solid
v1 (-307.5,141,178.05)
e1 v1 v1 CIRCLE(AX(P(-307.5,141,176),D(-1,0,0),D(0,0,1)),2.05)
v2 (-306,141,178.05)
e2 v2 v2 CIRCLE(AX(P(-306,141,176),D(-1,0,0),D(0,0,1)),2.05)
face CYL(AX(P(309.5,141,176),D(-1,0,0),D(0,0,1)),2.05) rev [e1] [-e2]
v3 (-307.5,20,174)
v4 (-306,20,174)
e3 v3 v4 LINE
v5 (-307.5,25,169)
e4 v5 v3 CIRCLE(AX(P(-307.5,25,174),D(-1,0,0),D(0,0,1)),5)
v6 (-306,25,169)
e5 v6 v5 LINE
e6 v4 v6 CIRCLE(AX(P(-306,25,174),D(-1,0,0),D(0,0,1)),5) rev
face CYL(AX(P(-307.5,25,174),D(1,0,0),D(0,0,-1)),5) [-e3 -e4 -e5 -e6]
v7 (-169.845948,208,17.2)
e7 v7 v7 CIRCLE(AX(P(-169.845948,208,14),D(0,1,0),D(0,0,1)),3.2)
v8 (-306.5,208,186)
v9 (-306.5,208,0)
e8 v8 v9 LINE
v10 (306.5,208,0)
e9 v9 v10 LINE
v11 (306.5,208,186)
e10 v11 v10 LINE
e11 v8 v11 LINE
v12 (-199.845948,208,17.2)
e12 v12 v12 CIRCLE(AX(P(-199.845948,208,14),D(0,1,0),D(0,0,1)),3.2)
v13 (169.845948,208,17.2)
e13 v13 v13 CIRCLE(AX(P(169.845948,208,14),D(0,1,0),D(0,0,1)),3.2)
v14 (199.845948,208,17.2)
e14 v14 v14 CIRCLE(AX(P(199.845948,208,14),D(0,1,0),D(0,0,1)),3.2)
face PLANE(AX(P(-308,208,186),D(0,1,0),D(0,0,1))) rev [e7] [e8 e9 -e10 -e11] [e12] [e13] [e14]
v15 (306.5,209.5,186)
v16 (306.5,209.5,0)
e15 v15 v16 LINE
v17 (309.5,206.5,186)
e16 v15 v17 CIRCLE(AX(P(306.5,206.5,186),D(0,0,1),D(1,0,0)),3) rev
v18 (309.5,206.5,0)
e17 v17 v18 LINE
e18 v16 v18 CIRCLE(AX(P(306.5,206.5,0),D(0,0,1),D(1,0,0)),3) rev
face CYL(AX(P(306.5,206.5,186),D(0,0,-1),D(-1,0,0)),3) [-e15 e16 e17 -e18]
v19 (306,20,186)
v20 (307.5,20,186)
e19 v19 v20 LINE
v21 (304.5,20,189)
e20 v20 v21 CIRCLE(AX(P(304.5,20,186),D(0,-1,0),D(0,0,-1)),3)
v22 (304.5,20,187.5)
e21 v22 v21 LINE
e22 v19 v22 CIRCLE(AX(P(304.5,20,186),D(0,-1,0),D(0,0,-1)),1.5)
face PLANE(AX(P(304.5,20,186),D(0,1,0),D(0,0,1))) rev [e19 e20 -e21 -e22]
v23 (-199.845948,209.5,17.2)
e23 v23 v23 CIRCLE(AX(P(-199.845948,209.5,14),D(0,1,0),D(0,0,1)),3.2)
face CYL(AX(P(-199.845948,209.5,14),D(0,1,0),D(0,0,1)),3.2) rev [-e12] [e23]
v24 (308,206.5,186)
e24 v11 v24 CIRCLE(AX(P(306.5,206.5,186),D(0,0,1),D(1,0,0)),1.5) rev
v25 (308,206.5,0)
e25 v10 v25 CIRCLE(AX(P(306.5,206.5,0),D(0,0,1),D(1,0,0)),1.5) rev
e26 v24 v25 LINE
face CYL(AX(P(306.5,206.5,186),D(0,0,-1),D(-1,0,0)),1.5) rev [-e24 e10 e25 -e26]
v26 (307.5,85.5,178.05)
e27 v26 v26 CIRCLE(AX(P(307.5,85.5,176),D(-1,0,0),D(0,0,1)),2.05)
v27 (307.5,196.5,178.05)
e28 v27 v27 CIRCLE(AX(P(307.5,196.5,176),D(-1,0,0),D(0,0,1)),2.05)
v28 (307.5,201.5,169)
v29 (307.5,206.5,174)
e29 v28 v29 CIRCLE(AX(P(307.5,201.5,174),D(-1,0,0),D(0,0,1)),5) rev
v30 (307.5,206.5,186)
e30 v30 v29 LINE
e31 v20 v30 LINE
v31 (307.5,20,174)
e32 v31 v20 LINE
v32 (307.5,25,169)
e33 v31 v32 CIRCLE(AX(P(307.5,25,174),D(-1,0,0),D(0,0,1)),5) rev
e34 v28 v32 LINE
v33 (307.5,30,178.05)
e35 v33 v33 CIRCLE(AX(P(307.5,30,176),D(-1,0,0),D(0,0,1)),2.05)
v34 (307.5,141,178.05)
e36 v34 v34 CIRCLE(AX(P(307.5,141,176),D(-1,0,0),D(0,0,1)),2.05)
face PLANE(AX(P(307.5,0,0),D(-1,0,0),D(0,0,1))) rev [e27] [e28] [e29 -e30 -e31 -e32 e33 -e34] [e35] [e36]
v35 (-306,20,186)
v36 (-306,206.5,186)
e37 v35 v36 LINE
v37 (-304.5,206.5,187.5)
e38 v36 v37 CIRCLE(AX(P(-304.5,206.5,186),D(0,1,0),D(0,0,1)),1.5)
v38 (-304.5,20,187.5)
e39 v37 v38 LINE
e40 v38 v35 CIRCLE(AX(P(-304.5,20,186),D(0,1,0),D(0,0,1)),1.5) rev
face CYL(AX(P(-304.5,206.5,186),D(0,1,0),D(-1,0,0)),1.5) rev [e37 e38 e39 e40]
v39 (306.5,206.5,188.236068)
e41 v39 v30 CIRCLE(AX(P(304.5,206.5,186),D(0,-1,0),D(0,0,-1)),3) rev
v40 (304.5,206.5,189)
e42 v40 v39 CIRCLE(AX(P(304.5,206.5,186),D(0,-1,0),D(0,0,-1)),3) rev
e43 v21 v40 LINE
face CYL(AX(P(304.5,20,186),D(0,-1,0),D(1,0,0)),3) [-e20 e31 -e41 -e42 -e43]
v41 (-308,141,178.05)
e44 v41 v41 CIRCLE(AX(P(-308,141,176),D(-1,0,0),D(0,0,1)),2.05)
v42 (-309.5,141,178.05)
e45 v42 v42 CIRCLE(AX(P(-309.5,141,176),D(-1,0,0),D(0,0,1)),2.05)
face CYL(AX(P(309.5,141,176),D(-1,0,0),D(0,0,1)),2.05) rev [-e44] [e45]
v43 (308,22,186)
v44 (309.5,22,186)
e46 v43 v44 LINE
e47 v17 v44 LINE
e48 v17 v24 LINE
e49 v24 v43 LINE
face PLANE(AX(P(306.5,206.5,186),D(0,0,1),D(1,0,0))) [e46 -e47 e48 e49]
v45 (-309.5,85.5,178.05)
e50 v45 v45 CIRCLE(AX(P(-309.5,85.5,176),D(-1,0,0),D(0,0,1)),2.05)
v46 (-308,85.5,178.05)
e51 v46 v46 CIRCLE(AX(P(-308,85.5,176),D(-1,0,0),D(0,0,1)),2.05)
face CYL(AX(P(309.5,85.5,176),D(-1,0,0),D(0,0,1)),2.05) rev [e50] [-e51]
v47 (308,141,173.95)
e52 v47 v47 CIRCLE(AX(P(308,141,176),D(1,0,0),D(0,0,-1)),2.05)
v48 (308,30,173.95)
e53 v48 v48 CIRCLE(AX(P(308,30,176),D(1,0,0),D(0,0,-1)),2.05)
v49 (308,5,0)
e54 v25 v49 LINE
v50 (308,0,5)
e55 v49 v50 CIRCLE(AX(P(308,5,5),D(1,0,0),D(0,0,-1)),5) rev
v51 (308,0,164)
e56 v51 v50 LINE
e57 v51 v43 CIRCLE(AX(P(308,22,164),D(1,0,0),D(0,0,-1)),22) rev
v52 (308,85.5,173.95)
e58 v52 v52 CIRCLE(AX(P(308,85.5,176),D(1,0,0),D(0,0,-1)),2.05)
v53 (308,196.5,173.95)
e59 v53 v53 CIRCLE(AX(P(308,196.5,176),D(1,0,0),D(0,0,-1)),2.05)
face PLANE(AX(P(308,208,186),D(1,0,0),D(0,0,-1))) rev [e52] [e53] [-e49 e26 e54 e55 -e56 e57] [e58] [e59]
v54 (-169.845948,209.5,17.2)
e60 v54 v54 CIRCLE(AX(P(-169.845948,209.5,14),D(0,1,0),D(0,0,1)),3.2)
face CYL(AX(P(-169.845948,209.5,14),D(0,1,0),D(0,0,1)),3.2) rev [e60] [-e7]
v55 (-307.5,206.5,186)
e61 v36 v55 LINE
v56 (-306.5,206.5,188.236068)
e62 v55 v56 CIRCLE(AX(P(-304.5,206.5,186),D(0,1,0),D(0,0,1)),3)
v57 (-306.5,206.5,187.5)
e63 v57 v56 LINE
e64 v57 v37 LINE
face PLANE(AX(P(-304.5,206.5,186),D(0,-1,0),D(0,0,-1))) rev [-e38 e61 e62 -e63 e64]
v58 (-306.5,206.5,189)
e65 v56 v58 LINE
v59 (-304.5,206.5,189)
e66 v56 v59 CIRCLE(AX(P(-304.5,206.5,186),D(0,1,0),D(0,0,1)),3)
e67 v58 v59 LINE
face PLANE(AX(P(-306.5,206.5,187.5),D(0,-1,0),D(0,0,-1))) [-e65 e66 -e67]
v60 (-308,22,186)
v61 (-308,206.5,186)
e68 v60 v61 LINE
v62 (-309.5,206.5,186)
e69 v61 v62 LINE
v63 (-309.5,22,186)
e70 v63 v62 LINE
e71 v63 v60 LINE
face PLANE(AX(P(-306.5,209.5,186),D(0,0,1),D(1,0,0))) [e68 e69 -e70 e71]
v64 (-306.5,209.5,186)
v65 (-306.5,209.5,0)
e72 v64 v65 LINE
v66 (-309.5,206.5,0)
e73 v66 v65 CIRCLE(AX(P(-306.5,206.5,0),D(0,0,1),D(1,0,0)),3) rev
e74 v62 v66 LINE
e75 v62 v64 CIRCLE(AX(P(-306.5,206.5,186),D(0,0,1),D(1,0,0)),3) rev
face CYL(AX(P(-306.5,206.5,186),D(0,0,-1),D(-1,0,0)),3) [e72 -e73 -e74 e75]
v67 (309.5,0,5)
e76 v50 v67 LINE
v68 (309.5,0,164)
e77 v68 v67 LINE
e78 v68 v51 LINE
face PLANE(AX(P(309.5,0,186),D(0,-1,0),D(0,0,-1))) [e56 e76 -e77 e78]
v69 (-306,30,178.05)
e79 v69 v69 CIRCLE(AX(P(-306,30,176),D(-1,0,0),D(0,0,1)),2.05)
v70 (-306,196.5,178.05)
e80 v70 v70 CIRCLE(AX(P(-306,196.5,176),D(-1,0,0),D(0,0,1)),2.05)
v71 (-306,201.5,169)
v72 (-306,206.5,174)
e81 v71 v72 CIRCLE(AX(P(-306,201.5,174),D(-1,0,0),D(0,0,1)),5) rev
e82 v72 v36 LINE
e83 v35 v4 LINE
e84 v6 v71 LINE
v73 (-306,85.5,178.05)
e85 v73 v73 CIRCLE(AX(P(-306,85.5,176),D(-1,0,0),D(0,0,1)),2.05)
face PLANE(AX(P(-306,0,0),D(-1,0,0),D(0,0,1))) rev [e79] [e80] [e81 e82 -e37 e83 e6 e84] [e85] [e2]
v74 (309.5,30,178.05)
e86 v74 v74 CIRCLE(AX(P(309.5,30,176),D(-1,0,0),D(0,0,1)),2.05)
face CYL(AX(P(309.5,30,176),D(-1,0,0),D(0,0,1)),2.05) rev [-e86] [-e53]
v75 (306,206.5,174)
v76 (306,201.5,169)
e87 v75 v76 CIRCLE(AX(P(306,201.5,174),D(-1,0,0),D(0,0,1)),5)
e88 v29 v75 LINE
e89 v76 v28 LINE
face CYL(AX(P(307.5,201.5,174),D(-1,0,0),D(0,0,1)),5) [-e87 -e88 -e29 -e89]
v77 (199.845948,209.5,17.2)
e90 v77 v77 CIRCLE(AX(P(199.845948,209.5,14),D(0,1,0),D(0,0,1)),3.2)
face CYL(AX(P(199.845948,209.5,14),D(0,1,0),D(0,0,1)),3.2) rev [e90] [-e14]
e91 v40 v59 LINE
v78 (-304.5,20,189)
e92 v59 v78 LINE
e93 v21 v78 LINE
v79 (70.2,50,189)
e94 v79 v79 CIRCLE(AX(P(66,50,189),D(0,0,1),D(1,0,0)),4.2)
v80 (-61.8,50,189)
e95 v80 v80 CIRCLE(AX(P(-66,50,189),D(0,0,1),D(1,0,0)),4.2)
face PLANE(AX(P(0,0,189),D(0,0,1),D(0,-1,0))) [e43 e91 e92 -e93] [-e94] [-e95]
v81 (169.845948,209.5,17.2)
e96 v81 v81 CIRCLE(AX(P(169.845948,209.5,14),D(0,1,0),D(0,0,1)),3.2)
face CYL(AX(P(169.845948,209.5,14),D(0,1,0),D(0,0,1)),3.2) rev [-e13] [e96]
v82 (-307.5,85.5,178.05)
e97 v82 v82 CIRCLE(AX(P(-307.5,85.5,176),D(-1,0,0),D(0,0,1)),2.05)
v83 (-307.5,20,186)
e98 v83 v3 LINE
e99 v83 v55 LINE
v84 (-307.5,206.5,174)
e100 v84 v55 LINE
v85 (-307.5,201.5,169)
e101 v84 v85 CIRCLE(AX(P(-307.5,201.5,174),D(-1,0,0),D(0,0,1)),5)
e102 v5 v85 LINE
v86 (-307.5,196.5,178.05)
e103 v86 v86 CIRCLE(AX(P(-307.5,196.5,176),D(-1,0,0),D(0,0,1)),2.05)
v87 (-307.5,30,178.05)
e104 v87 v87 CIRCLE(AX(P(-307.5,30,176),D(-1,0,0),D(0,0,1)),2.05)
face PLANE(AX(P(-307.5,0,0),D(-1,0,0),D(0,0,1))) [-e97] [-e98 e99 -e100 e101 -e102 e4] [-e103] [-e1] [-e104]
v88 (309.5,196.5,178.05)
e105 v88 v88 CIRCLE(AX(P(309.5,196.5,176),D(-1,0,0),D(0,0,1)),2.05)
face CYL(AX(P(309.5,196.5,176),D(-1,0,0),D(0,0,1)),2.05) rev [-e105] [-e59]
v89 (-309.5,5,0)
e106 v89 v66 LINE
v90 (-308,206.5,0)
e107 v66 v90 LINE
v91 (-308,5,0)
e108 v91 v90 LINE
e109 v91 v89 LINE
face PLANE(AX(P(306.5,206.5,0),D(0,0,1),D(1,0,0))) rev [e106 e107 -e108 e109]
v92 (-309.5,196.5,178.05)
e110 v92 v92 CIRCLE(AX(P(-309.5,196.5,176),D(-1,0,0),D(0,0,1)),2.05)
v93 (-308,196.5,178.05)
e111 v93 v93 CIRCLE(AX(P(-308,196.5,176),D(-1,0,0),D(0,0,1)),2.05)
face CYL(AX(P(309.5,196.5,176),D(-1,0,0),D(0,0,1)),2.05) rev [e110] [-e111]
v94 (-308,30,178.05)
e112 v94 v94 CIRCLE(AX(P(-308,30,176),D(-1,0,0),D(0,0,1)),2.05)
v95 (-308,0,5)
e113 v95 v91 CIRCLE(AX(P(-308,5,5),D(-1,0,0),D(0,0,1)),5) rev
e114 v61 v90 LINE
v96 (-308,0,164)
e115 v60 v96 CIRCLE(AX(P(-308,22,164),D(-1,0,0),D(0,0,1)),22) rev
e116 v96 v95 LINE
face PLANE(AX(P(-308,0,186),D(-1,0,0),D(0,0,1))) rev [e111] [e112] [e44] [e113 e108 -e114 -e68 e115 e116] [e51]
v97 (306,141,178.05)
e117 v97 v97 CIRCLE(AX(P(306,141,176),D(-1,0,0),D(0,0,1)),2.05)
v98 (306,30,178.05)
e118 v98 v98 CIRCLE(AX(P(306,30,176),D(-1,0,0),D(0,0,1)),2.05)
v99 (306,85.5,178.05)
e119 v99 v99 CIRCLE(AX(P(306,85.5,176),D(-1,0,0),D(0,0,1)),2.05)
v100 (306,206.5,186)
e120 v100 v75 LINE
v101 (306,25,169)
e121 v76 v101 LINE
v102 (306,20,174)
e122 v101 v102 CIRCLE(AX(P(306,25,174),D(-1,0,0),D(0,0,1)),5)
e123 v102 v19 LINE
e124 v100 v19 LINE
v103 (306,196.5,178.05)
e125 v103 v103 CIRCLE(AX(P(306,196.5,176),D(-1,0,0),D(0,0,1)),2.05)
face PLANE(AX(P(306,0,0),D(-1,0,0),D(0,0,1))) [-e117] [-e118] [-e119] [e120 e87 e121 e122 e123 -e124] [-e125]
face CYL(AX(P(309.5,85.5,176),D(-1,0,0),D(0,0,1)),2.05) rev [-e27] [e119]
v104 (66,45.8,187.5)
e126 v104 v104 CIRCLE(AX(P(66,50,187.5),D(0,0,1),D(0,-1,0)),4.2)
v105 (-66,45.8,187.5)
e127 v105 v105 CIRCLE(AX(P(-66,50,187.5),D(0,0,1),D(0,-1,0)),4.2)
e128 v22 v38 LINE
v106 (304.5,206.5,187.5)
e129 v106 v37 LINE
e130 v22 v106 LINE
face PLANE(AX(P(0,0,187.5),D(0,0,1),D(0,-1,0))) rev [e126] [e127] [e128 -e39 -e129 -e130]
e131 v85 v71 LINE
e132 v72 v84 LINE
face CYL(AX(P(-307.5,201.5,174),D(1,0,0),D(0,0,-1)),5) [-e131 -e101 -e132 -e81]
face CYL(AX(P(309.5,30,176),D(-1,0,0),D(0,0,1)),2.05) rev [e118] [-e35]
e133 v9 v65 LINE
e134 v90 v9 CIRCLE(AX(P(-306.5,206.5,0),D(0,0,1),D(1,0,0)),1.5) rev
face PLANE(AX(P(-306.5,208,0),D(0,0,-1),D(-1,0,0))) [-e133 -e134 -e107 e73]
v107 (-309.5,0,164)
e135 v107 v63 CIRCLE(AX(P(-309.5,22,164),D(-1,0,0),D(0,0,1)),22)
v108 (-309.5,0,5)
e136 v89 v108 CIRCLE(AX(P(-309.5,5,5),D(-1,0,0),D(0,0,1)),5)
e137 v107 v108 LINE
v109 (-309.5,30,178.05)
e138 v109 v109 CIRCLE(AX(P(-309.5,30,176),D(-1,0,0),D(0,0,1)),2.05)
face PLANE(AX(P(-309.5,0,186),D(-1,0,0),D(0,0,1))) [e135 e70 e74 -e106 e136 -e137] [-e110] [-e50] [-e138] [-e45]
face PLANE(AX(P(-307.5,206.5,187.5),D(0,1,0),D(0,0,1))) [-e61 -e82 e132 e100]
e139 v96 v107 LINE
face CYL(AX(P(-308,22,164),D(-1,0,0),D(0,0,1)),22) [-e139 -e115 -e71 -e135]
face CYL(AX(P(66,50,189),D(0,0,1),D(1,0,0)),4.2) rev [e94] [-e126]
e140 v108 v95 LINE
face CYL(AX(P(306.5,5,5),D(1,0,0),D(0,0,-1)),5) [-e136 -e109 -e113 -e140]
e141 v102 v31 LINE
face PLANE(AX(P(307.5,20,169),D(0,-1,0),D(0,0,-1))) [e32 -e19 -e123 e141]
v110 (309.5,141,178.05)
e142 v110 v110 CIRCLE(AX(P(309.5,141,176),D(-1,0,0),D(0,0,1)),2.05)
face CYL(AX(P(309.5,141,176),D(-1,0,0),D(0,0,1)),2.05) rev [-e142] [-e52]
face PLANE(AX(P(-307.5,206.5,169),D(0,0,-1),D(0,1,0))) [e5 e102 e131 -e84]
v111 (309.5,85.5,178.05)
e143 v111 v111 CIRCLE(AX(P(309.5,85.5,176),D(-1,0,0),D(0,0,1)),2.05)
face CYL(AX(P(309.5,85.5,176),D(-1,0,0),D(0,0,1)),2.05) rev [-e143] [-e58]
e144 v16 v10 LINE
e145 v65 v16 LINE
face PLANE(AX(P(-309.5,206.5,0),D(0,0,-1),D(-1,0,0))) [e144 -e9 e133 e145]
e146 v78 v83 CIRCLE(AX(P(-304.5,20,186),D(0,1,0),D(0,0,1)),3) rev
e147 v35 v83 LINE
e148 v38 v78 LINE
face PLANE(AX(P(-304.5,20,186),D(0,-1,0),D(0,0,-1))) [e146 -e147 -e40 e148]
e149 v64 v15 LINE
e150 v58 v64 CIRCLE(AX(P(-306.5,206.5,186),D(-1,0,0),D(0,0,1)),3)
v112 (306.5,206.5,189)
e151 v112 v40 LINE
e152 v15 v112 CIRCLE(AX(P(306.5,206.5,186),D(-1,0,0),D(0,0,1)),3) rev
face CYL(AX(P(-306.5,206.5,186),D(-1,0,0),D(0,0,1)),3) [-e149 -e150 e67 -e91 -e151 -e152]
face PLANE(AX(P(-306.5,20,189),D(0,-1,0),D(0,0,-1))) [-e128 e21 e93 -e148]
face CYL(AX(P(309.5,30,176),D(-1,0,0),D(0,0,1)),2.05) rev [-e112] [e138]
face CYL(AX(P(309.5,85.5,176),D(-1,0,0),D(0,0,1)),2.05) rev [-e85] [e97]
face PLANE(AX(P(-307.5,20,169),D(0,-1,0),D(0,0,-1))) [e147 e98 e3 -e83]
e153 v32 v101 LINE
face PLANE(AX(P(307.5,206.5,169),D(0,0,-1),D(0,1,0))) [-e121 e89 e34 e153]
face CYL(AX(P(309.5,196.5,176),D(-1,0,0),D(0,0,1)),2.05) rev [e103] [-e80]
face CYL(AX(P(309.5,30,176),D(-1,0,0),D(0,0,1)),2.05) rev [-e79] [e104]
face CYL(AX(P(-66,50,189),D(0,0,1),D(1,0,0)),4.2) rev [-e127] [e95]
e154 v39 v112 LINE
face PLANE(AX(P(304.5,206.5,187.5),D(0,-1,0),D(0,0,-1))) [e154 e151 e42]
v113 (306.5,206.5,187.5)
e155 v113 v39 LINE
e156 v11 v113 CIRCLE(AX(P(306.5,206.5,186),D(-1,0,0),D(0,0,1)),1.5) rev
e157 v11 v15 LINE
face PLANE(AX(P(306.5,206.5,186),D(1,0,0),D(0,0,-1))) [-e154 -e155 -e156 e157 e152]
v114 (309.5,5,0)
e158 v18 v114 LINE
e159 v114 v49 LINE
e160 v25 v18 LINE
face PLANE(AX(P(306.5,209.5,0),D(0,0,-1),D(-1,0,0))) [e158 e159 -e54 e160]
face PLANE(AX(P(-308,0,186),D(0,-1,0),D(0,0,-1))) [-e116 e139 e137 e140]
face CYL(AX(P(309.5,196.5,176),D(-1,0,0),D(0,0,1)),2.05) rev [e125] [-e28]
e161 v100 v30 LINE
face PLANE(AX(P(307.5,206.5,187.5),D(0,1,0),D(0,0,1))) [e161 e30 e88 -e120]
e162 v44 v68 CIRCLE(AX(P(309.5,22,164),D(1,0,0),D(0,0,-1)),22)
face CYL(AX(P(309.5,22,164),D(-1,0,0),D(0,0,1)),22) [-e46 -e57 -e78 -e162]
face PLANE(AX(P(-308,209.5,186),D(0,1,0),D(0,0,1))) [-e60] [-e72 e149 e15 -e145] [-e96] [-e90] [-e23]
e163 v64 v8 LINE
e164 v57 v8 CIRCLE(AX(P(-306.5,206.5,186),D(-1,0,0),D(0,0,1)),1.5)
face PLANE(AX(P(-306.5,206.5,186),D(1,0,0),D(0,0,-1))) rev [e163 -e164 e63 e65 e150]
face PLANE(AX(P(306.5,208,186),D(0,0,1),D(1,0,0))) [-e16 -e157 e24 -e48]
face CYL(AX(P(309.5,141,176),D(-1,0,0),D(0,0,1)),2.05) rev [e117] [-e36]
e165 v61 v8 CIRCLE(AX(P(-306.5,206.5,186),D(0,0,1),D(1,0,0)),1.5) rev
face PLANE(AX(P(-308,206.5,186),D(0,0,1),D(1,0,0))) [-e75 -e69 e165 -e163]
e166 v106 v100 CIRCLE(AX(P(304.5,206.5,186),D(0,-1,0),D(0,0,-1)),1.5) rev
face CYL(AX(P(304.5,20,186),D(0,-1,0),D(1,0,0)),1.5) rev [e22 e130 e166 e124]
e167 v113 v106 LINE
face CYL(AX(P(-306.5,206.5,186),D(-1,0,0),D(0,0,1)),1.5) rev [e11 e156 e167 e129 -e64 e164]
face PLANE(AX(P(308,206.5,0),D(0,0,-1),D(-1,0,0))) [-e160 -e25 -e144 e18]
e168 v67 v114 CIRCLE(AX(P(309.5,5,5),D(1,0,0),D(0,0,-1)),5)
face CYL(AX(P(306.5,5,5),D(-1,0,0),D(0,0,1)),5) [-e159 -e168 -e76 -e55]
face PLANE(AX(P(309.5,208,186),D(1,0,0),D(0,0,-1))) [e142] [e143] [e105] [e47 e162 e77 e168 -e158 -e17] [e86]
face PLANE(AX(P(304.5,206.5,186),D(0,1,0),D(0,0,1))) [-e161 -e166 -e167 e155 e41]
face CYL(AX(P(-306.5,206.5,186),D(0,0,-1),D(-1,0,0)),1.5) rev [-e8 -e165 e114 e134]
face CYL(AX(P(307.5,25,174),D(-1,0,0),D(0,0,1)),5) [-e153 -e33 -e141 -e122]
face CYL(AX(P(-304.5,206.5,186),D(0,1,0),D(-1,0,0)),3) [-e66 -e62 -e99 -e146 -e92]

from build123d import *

# Parameters (mm, degrees)
BASE_FLANGE1_DEPTH             = 186
EDGE_FLANGE1_DEPTH             = 613
M6_CLEARANCE_HOLE1_D           = 6.4
EDGE_FLANGE2_STRIP_W           = 10
EDGE_FLANGE2_STRIP_H           = 1.5
EDGE_FLANGE2_STRIP_CUT_DEPTH   = 186.5
EDGE_FLANGE2_STRIP_2_W         = 10
EDGE_FLANGE2_STRIP_2_H         = 1.5
EDGE_FLANGE2_STRIP_CUT_2_DEPTH = 186.5
EDGE_FLANGE2_DEPTH             = 186.5
EDGE_FLANGE2_BEND_DEPTH        = 186.5
SKETCH17_R                     = 2.05
CUT_EXTRUDE1_DEPTH             = 681.27365817
LPATTERN1_COUNT                = 4
LPATTERN1_PITCH                = 55.5
FILLET1_R                      = 22
FILLET2_R                      = 5
M8_CLEARANCE_HOLE1_D           = 8.4


# Sheet-metal steps are written as plain solids
with BuildPart() as part:
    # Sketch1 → Base-Flange1 (new body)
    with BuildSketch(Plane.XY):
        with BuildLine():
            Line((-308, 0), (-308, 206.5))
            ThreePointArc((-308, 206.5), (-307.560660172, 207.560660172), (-306.5, 208))
            Line((-306.5, 208), (306.5, 208))
            ThreePointArc((306.5, 208), (307.560660172, 207.560660172), (308, 206.5))
            Line((308, 206.5), (308, 0))
            Line((308, 0), (309.5, 0))
            Line((309.5, 0), (309.5, 206.5))
            ThreePointArc((309.5, 206.5), (308.621320344, 208.621320344), (306.5, 209.5))
            Line((306.5, 209.5), (-306.5, 209.5))
            ThreePointArc((-306.5, 209.5), (-308.621320344, 208.621320344), (-309.5, 206.5))
            Line((-309.5, 206.5), (-309.5, 0))
            Line((-309.5, 0), (-308, 0))
        make_face()
    extrude(amount=BASE_FLANGE1_DEPTH)

    # Edge-Flange1 section (across the edge) → Edge-Flange1 (add)
    with BuildSketch(Plane(origin=(306.5, 208, 187.5), x_dir=(0, 0, -1), z_dir=(-1, 0, 0))):
        with BuildLine():
            Line((-1.5, 1.5), (-1.5, 188))
            Line((-1.5, 188), (0, 188))
            Line((0, 188), (0, 1.5))
            ThreePointArc((0, 1.5), (0.439339828, 0.439339828), (1.5, 0))
            Line((1.5, 0), (1.5, -1.5))
            ThreePointArc((1.5, -1.5), (-0.621320344, -0.621320344), (-1.5, 1.5))
        make_face()
    extrude(amount=EDGE_FLANGE1_DEPTH)

    # M6 Clearance Hole1 (through all)
    with Locations(Plane(origin=(0, 209.5, 0), x_dir=(1, 0, 0), z_dir=(0, 1, 0))):
        with Locations((-199.845948124, -14), (-169.845948124, -14)):
            m6_clearance_hole1 = Hole(M6_CLEARANCE_HOLE1_D / 2)

    # Mirror1: M6 Clearance Hole1 across plane
    add(m6_clearance_hole1.mirror(Plane(origin=(0, 0, 0), x_dir=(0, 0, 1), z_dir=(1, 0, 0))), mode=Mode.SUBTRACT)

    # Edge-Flange2 strip (across the edge) → Edge-Flange2 strip cut (cut)
    with BuildSketch(Plane(origin=(-307.5, 20, 187.5), x_dir=(1, 0, 0), z_dir=(0, 1, 0))):
        with Locations((-2, -0.75)):
            Rectangle(EDGE_FLANGE2_STRIP_W, EDGE_FLANGE2_STRIP_H)
    extrude(amount=EDGE_FLANGE2_STRIP_CUT_DEPTH, mode=Mode.SUBTRACT)

    # Edge-Flange2 strip 2 (across the edge) → Edge-Flange2 strip cut 2 (cut)
    with BuildSketch(Plane(origin=(307.5, 206.5, 187.5), x_dir=(-1, 0, 0), z_dir=(0, -1, 0))):
        with Locations((-2, -0.75)):
            Rectangle(EDGE_FLANGE2_STRIP_2_W, EDGE_FLANGE2_STRIP_2_H)
    extrude(amount=EDGE_FLANGE2_STRIP_CUT_2_DEPTH, mode=Mode.SUBTRACT)

    # Edge-Flange2 section (across the edge) → Edge-Flange2 (add)
    with BuildSketch(Plane(origin=(-307.5, 20, 187.5), x_dir=(1, 0, 0), z_dir=(0, 1, 0))):
        with BuildLine():
            Line((0, 1.5), (0, 18.5))
            Line((0, 18.5), (1.5, 18.5))
            Line((1.5, 18.5), (1.5, 1.5))
            ThreePointArc((1.5, 1.5), (1.939339828, 0.439339828), (3, 0))
            Line((3, 0), (3, -1.5))
            ThreePointArc((3, -1.5), (0.878679656, -0.621320344), (0, 1.5))
        make_face()
    extrude(amount=EDGE_FLANGE2_DEPTH)

    # Edge-Flange2 section 2 (across the edge) → Edge-Flange2 bend (add)
    with BuildSketch(Plane(origin=(307.5, 206.5, 187.5), x_dir=(-1, 0, 0), z_dir=(0, -1, 0))):
        with BuildLine():
            Line((0, 1.5), (0, 18.5))
            Line((0, 18.5), (1.5, 18.5))
            Line((1.5, 18.5), (1.5, 1.5))
            ThreePointArc((1.5, 1.5), (1.939339828, 0.439339828), (3, 0))
            Line((3, 0), (3, -1.5))
            ThreePointArc((3, -1.5), (0.878679656, -0.621320344), (0, 1.5))
        make_face()
    extrude(amount=EDGE_FLANGE2_BEND_DEPTH)

    # Sketch17 → Cut-Extrude1 (cut, through all)
    with BuildSketch(Plane.ZY.offset(309.5)):
        with Locations((176, 196.5)):
            Circle(SKETCH17_R)
    cut_extrude1 = extrude(amount=-CUT_EXTRUDE1_DEPTH, mode=Mode.SUBTRACT)

    # LPattern1: Cut-Extrude1 ×4
    with Locations(*[(0, -i * LPATTERN1_PITCH, 0) for i in range(1, LPATTERN1_COUNT)]):
        add(cut_extrude1, mode=Mode.SUBTRACT)

    # Fillet1
    fillet1_edges = [part.edges().sort_by_distance(p)[0] for p in [
        (-308.75, 0, 186),
        (308.75, 0, 186),
    ]]
    fillet(fillet1_edges, radius=FILLET1_R)

    # Fillet2
    fillet2_edges = [part.edges().sort_by_distance(p)[0] for p in [
        (-308.75, 0, 0),
        (-306.75, 20, 169),
        (-306.75, 206.5, 169),
        (308.75, 0, 0),
        (306.75, 206.5, 169),
        (306.75, 20, 169),
    ]]
    fillet(fillet2_edges, radius=FILLET2_R)

    # M8 Clearance Hole1 (through all)
    with Locations(Plane.XY.offset(189)):
        with Locations((-66, 50), (66, 50)):
            Hole(M8_CLEARANCE_HOLE1_D / 2)


solid = part.part
